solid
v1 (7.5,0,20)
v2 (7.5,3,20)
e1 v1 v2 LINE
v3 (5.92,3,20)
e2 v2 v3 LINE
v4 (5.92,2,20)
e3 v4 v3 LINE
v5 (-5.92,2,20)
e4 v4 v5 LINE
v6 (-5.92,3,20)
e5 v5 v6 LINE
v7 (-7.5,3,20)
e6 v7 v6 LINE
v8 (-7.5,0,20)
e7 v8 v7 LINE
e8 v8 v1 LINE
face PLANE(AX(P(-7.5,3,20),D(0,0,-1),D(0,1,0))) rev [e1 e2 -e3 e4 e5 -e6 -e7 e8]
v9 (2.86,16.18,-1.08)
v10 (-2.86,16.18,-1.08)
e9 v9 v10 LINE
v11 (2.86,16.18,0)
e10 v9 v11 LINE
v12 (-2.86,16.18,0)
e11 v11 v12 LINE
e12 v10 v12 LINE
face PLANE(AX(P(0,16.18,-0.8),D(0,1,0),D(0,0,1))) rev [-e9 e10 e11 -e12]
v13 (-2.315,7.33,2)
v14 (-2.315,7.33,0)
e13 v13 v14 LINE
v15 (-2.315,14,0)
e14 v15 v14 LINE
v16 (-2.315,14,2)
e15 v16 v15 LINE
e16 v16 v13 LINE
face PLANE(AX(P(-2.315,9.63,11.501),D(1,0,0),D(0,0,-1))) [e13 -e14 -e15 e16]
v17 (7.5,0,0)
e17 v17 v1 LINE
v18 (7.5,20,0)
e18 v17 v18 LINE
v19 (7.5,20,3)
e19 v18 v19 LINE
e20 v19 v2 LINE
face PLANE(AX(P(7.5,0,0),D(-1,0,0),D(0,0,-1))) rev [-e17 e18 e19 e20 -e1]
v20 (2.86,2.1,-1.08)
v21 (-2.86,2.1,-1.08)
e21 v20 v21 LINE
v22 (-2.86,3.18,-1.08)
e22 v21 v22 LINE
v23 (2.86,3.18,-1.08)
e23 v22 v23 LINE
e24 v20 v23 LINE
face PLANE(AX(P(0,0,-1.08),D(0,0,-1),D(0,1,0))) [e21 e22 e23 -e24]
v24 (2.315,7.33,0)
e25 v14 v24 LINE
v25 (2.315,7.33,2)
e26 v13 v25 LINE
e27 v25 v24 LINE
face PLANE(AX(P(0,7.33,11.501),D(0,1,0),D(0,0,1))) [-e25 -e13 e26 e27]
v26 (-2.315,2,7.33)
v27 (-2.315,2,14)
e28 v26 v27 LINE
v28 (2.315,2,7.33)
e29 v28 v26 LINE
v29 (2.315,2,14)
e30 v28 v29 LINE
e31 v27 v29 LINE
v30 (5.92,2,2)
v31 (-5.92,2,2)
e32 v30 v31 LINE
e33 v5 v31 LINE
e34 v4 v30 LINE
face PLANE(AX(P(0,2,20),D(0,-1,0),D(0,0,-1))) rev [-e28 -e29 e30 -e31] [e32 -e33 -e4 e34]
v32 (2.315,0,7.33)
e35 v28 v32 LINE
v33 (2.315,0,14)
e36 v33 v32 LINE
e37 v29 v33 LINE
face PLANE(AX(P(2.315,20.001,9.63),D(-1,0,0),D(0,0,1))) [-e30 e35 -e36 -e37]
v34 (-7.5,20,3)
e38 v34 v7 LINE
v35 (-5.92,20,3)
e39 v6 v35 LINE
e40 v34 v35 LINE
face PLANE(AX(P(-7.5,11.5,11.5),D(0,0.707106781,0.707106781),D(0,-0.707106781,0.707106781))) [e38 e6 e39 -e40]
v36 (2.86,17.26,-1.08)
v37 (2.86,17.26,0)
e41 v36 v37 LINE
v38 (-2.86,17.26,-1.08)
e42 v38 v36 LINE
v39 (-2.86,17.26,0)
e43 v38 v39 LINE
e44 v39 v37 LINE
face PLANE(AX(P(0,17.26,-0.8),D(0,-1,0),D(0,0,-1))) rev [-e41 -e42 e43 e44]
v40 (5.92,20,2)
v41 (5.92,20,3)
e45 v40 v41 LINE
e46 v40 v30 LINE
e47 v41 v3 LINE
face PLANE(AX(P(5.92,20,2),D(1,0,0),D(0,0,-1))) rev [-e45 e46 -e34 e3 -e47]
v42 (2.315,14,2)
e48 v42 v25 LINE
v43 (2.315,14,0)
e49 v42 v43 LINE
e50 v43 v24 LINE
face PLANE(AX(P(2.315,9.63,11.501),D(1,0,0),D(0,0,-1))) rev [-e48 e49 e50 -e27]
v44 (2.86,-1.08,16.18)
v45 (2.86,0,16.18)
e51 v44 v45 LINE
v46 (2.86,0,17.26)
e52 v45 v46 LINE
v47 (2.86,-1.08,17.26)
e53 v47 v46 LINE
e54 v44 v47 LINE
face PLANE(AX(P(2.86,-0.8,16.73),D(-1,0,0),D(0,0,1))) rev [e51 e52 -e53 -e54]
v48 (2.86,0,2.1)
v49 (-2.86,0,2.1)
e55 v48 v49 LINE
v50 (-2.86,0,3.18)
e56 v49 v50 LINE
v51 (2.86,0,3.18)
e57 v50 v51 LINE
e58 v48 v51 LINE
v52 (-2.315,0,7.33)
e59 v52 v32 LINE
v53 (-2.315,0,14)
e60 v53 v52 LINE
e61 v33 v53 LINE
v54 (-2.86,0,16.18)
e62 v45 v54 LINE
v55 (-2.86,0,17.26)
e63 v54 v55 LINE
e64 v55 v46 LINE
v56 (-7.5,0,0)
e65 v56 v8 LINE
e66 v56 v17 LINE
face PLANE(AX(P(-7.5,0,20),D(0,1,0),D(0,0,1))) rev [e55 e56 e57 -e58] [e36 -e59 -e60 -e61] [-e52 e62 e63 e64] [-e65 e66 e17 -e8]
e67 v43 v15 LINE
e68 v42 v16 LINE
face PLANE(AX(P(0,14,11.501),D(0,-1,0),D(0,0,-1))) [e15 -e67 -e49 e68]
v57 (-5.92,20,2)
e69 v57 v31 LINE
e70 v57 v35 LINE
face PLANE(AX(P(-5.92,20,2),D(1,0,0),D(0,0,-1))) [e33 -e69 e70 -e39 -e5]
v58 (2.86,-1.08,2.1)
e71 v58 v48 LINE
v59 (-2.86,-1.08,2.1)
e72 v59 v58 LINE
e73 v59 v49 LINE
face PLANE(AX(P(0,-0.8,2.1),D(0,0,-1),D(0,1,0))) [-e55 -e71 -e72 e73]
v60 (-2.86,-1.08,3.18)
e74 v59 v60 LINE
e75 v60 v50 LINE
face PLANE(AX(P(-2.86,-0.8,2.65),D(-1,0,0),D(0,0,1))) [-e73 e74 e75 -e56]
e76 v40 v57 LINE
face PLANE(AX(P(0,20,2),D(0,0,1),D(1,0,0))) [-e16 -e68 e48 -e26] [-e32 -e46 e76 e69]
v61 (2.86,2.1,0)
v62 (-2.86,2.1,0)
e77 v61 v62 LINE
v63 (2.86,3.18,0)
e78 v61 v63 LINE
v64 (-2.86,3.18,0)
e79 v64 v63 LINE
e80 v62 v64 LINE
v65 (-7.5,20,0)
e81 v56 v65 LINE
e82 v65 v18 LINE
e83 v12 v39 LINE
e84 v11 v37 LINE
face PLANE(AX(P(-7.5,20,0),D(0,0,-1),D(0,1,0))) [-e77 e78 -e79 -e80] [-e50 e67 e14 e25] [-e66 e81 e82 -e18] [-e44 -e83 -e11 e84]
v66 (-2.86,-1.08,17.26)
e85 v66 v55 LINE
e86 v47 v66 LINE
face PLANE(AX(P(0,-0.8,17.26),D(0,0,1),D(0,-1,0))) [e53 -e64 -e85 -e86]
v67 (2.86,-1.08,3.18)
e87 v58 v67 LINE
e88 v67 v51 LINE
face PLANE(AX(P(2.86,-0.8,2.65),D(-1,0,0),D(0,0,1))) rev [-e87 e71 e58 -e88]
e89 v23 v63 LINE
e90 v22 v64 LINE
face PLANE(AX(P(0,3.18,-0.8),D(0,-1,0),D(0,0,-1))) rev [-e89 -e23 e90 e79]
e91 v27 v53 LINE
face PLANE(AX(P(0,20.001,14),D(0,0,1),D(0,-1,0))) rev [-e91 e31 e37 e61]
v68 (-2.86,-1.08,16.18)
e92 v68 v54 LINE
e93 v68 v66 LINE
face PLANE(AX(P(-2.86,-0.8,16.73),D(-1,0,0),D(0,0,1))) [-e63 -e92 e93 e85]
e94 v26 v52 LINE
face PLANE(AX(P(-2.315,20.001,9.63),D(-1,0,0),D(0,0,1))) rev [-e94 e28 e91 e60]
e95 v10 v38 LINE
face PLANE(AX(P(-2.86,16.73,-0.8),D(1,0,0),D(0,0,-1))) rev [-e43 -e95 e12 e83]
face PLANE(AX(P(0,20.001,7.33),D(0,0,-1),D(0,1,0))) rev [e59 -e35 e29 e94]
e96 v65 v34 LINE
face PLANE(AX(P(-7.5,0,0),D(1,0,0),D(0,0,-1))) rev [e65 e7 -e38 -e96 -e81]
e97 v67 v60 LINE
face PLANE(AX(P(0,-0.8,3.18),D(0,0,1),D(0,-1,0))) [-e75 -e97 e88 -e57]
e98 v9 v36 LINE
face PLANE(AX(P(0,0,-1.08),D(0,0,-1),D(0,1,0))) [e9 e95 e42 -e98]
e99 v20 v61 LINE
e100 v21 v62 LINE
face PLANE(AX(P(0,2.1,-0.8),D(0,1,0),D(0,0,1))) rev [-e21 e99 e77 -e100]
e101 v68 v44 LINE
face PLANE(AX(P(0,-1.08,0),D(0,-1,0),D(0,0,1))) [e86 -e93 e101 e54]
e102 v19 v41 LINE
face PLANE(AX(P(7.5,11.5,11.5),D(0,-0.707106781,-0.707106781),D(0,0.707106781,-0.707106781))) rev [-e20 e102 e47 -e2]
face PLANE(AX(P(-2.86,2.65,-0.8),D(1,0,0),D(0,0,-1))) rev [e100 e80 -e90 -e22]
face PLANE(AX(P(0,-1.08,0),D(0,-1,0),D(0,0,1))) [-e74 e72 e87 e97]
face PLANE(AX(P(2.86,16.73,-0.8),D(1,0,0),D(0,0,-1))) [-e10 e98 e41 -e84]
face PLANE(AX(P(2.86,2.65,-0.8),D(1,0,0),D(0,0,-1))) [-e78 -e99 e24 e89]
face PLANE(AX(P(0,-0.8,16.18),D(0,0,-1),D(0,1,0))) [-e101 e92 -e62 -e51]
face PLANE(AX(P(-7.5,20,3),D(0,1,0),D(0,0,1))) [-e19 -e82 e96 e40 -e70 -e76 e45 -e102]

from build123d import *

# Parameters (mm, degrees)
BOSS_EXTRUDE2_DEPTH     = 7.5
CAVITY_START            = 2
SKETCH3_W               = 5.92
SKETCH3_H               = 9.5
CAVITY_DEPTH            = 23.259018941
SLOT_CUT_REACH          = 26.259
SQUARE_START            = -2
SKETCH8_W               = 2.315
SKETCH8_H               = 6.67
SQUARE_SLOT_DEPTH       = 2
BOSS_EXTRUDE3_DEPTH     = 0.8
SKETCH9_W               = 2.86
SKETCH9_H               = 1.08
SQUARE_RAILS_DEPTH      = 1.08
HALF_START              = 5.92
HALF_MIRROR_DEPTH       = 1.58
HALF_MIRROR_2_OUTLINE_W = 6
HALF_MIRROR_2_OUTLINE_H = 2
HALF_MIRROR_2_DEPTH     = 5.92
HALF_START_2            = 2.315
HALF_MIRROR_3_OUTLINE_W = 6.67
HALF_MIRROR_3_OUTLINE_H = 2
HALF_MIRROR_3_DEPTH     = 3.605
HALF_MIRROR_4_OUTLINE_W = 1.08
HALF_MIRROR_4_OUTLINE_H = 1.08
HALF_MIRROR_4_DEPTH     = 2.86
FULL_START              = -7.5
FULL_MIRROR_OUTLINE_W   = 2
FULL_MIRROR_OUTLINE_H   = 6
FULL_MIRROR_DEPTH       = 15
FULL_MIRROR_2_DEPTH     = 1.58
FULL_START_2            = 5.92
FULL_MIRROR_3_DEPTH     = 1.58
FULL_START_3            = -5.92
FULL_MIRROR_4_OUTLINE_W = 2
FULL_MIRROR_4_OUTLINE_H = 6.67
FULL_MIRROR_4_DEPTH     = 3.605
FULL_START_4            = 2.315
FULL_MIRROR_5_OUTLINE_W = 2
FULL_MIRROR_5_OUTLINE_H = 6.67
FULL_MIRROR_5_DEPTH     = 3.605
FULL_START_5            = -2.86
FULL_MIRROR_6_OUTLINE_W = 1.08
FULL_MIRROR_6_OUTLINE_H = 1.08
FULL_MIRROR_6_DEPTH     = 5.72


# Read off the part's stored shape, not the designer's step: Half mirror, Full mirror
with BuildPart() as part:
    # Sketch2 → Boss-Extrude2 (new body)
    with BuildSketch(Plane(origin=(0, 0, 0), x_dir=(0, 0, -1), z_dir=(1, 0, 0))):
        Polygon((-11.5, 11.5), (-3, 20), (0, 20), (0, 0), align=None)
    extrude(amount=-BOSS_EXTRUDE2_DEPTH)

    # Sketch3 → Cavity (cut, through all)
    with BuildSketch(Plane(origin=(0, 0, 0), x_dir=(1, 0, 0), z_dir=(0, 1, 0)).offset(CAVITY_START)):
        with Locations((-2.96, -6.75)):
            Rectangle(SKETCH3_W, SKETCH3_H)
    extrude(amount=CAVITY_DEPTH, mode=Mode.SUBTRACT)

    # Sketch4 → Slot cut (cut, up to next)
    with BuildSketch(Plane.XY, mode=Mode.PRIVATE) as slot_cut_sk1:
        with BuildLine():
            Line((0, 7.33), (-0.015, 7.33))
            ThreePointArc((-0.015, 7.33), (-1.641345597, 8.003654403), (-2.315, 9.63))
            Line((-2.315, 9.63), (-2.315, 11.7))
            ThreePointArc((-2.315, 11.7), (-1.641345597, 13.326345597), (-0.015, 14))
            Line((-0.015, 14), (0, 14))
            Line((0, 14), (0, 7.33))
        make_face()
    slot_cut_tool1 = extrude(slot_cut_sk1.sketch, amount=SLOT_CUT_REACH, mode=Mode.PRIVATE) & part.part
    add(slot_cut_tool1.solids().sort_by_distance((-1.046523, 10.665, 0))[0], mode=Mode.SUBTRACT)

    # Sketch8 → Square slot (cut)
    with BuildSketch(Plane(origin=(0, 0, 0), x_dir=(-1, 0, 0), z_dir=(0, 0, -1)).offset(SQUARE_START)):
        with Locations((1.1575, 10.665)):
            Rectangle(SKETCH8_W, SKETCH8_H)
    extrude(amount=SQUARE_SLOT_DEPTH, mode=Mode.SUBTRACT)

    # Sketch6 → Boss-Extrude3 (add)
    with BuildSketch(Plane(origin=(0, 0, 0), x_dir=(-1, 0, 0), z_dir=(0, 0, -1))):
        with BuildLine():
            Line((0, 3.18), (2.33, 3.18))
            ThreePointArc((2.33, 3.18), (2.704766594, 3.024766594), (2.86, 2.65))
            Line((2.86, 2.65), (2.86, 2.63))
            ThreePointArc((2.86, 2.63), (2.704766594, 2.255233406), (2.33, 2.1))
            Line((2.33, 2.1), (0, 2.1))
            Line((0, 2.1), (0, 3.18))
        make_face()
        with BuildLine():
            Line((0, 17.26), (2.33, 17.26))
            ThreePointArc((2.33, 17.26), (2.704766594, 17.104766594), (2.86, 16.73))
            Line((2.86, 16.73), (2.86, 16.71))
            ThreePointArc((2.86, 16.71), (2.704766594, 16.335233406), (2.33, 16.18))
            Line((2.33, 16.18), (0, 16.18))
            Line((0, 16.18), (0, 17.26))
        make_face()
    extrude(amount=BOSS_EXTRUDE3_DEPTH)

    # Sketch9 → Square rails (add)
    with BuildSketch(Plane(origin=(0, 0, 0), x_dir=(-1, 0, 0), z_dir=(0, 0, -1))):
        with Locations((1.43, 16.72)):
            Rectangle(SKETCH9_W, SKETCH9_H)
        with Locations((1.43, 2.64)):
            Rectangle(SKETCH9_W, SKETCH9_H)
    extrude(amount=SQUARE_RAILS_DEPTH)



with BuildPart() as body_2:
    # Half mirror outline → Half mirror (new body)
    with BuildSketch(Plane.YZ.offset(HALF_START)):
        Polygon((0, 0), (20, 0), (20, 3), (11.5, 11.5), align=None)
    extrude(amount=HALF_MIRROR_DEPTH)


with BuildPart() as part_1:
    add(part.part)

    add(body_2.part)  # Half mirror 2 merges body 2
    # Half mirror 2 outline → Half mirror 2 (add)
    with BuildSketch(Plane.YZ):
        Polygon((2, 2), (0, 0), (7.33, 0), (7.33, 2), align=None)
        with Locations((17, 1)):
            Rectangle(HALF_MIRROR_2_OUTLINE_W, HALF_MIRROR_2_OUTLINE_H)
    extrude(amount=HALF_MIRROR_2_DEPTH)

    # Half mirror 3 outline → Half mirror 3 (add)
    with BuildSketch(Plane.YZ.offset(HALF_START_2)):
        with Locations((10.665, 1)):
            Rectangle(HALF_MIRROR_3_OUTLINE_W, HALF_MIRROR_3_OUTLINE_H)
    extrude(amount=HALF_MIRROR_3_DEPTH)

    # Half mirror 4 outline → Half mirror 4 (add)
    with BuildSketch(Plane.YZ):
        with Locations((2.64, -0.54)):
            Rectangle(HALF_MIRROR_4_OUTLINE_W, HALF_MIRROR_4_OUTLINE_H)
        with Locations((16.72, -0.54)):
            Rectangle(HALF_MIRROR_4_OUTLINE_W, HALF_MIRROR_4_OUTLINE_H)
    extrude(amount=HALF_MIRROR_4_DEPTH)

    # Full mirror outline → Full mirror (add)
    with BuildSketch(Plane.YZ.offset(FULL_START)):
        Polygon((0, 7.33), (0, 0), (2, 2), (2, 7.33), align=None)
        with Locations((1, 17)):
            Rectangle(FULL_MIRROR_OUTLINE_W, FULL_MIRROR_OUTLINE_H)
    extrude(amount=FULL_MIRROR_DEPTH)

    # Full mirror 2 outline → Full mirror 2 (add)
    with BuildSketch(Plane.YZ.offset(FULL_START)):
        Polygon((2, 7.33), (2, 2), (11.5, 11.5), (3, 20), (2, 20), (2, 14), (0, 14), (0, 7.33), align=None)
    extrude(amount=FULL_MIRROR_2_DEPTH)

    # Full mirror 3 outline → Full mirror 3 (add)
    with BuildSketch(Plane.YZ.offset(FULL_START_2)):
        Polygon((2, 7.33), (2, 2), (11.5, 11.5), (3, 20), (2, 20), (2, 14), (0, 14), (0, 7.33), align=None)
    extrude(amount=FULL_MIRROR_3_DEPTH)

    # Full mirror 4 outline → Full mirror 4 (add)
    with BuildSketch(Plane.YZ.offset(FULL_START_3)):
        with Locations((1, 10.665)):
            Rectangle(FULL_MIRROR_4_OUTLINE_W, FULL_MIRROR_4_OUTLINE_H)
    extrude(amount=FULL_MIRROR_4_DEPTH)

    # Full mirror 5 outline → Full mirror 5 (add)
    with BuildSketch(Plane.YZ.offset(FULL_START_4)):
        with Locations((1, 10.665)):
            Rectangle(FULL_MIRROR_5_OUTLINE_W, FULL_MIRROR_5_OUTLINE_H)
    extrude(amount=FULL_MIRROR_5_DEPTH)

    # Full mirror 6 outline → Full mirror 6 (add)
    with BuildSketch(Plane.YZ.offset(FULL_START_5)):
        with Locations((-0.54, 2.64)):
            Rectangle(FULL_MIRROR_6_OUTLINE_W, FULL_MIRROR_6_OUTLINE_H)
        with Locations((-0.54, 16.72)):
            Rectangle(FULL_MIRROR_6_OUTLINE_W, FULL_MIRROR_6_OUTLINE_H)
    extrude(amount=FULL_MIRROR_6_DEPTH)


solid = part_1.part
